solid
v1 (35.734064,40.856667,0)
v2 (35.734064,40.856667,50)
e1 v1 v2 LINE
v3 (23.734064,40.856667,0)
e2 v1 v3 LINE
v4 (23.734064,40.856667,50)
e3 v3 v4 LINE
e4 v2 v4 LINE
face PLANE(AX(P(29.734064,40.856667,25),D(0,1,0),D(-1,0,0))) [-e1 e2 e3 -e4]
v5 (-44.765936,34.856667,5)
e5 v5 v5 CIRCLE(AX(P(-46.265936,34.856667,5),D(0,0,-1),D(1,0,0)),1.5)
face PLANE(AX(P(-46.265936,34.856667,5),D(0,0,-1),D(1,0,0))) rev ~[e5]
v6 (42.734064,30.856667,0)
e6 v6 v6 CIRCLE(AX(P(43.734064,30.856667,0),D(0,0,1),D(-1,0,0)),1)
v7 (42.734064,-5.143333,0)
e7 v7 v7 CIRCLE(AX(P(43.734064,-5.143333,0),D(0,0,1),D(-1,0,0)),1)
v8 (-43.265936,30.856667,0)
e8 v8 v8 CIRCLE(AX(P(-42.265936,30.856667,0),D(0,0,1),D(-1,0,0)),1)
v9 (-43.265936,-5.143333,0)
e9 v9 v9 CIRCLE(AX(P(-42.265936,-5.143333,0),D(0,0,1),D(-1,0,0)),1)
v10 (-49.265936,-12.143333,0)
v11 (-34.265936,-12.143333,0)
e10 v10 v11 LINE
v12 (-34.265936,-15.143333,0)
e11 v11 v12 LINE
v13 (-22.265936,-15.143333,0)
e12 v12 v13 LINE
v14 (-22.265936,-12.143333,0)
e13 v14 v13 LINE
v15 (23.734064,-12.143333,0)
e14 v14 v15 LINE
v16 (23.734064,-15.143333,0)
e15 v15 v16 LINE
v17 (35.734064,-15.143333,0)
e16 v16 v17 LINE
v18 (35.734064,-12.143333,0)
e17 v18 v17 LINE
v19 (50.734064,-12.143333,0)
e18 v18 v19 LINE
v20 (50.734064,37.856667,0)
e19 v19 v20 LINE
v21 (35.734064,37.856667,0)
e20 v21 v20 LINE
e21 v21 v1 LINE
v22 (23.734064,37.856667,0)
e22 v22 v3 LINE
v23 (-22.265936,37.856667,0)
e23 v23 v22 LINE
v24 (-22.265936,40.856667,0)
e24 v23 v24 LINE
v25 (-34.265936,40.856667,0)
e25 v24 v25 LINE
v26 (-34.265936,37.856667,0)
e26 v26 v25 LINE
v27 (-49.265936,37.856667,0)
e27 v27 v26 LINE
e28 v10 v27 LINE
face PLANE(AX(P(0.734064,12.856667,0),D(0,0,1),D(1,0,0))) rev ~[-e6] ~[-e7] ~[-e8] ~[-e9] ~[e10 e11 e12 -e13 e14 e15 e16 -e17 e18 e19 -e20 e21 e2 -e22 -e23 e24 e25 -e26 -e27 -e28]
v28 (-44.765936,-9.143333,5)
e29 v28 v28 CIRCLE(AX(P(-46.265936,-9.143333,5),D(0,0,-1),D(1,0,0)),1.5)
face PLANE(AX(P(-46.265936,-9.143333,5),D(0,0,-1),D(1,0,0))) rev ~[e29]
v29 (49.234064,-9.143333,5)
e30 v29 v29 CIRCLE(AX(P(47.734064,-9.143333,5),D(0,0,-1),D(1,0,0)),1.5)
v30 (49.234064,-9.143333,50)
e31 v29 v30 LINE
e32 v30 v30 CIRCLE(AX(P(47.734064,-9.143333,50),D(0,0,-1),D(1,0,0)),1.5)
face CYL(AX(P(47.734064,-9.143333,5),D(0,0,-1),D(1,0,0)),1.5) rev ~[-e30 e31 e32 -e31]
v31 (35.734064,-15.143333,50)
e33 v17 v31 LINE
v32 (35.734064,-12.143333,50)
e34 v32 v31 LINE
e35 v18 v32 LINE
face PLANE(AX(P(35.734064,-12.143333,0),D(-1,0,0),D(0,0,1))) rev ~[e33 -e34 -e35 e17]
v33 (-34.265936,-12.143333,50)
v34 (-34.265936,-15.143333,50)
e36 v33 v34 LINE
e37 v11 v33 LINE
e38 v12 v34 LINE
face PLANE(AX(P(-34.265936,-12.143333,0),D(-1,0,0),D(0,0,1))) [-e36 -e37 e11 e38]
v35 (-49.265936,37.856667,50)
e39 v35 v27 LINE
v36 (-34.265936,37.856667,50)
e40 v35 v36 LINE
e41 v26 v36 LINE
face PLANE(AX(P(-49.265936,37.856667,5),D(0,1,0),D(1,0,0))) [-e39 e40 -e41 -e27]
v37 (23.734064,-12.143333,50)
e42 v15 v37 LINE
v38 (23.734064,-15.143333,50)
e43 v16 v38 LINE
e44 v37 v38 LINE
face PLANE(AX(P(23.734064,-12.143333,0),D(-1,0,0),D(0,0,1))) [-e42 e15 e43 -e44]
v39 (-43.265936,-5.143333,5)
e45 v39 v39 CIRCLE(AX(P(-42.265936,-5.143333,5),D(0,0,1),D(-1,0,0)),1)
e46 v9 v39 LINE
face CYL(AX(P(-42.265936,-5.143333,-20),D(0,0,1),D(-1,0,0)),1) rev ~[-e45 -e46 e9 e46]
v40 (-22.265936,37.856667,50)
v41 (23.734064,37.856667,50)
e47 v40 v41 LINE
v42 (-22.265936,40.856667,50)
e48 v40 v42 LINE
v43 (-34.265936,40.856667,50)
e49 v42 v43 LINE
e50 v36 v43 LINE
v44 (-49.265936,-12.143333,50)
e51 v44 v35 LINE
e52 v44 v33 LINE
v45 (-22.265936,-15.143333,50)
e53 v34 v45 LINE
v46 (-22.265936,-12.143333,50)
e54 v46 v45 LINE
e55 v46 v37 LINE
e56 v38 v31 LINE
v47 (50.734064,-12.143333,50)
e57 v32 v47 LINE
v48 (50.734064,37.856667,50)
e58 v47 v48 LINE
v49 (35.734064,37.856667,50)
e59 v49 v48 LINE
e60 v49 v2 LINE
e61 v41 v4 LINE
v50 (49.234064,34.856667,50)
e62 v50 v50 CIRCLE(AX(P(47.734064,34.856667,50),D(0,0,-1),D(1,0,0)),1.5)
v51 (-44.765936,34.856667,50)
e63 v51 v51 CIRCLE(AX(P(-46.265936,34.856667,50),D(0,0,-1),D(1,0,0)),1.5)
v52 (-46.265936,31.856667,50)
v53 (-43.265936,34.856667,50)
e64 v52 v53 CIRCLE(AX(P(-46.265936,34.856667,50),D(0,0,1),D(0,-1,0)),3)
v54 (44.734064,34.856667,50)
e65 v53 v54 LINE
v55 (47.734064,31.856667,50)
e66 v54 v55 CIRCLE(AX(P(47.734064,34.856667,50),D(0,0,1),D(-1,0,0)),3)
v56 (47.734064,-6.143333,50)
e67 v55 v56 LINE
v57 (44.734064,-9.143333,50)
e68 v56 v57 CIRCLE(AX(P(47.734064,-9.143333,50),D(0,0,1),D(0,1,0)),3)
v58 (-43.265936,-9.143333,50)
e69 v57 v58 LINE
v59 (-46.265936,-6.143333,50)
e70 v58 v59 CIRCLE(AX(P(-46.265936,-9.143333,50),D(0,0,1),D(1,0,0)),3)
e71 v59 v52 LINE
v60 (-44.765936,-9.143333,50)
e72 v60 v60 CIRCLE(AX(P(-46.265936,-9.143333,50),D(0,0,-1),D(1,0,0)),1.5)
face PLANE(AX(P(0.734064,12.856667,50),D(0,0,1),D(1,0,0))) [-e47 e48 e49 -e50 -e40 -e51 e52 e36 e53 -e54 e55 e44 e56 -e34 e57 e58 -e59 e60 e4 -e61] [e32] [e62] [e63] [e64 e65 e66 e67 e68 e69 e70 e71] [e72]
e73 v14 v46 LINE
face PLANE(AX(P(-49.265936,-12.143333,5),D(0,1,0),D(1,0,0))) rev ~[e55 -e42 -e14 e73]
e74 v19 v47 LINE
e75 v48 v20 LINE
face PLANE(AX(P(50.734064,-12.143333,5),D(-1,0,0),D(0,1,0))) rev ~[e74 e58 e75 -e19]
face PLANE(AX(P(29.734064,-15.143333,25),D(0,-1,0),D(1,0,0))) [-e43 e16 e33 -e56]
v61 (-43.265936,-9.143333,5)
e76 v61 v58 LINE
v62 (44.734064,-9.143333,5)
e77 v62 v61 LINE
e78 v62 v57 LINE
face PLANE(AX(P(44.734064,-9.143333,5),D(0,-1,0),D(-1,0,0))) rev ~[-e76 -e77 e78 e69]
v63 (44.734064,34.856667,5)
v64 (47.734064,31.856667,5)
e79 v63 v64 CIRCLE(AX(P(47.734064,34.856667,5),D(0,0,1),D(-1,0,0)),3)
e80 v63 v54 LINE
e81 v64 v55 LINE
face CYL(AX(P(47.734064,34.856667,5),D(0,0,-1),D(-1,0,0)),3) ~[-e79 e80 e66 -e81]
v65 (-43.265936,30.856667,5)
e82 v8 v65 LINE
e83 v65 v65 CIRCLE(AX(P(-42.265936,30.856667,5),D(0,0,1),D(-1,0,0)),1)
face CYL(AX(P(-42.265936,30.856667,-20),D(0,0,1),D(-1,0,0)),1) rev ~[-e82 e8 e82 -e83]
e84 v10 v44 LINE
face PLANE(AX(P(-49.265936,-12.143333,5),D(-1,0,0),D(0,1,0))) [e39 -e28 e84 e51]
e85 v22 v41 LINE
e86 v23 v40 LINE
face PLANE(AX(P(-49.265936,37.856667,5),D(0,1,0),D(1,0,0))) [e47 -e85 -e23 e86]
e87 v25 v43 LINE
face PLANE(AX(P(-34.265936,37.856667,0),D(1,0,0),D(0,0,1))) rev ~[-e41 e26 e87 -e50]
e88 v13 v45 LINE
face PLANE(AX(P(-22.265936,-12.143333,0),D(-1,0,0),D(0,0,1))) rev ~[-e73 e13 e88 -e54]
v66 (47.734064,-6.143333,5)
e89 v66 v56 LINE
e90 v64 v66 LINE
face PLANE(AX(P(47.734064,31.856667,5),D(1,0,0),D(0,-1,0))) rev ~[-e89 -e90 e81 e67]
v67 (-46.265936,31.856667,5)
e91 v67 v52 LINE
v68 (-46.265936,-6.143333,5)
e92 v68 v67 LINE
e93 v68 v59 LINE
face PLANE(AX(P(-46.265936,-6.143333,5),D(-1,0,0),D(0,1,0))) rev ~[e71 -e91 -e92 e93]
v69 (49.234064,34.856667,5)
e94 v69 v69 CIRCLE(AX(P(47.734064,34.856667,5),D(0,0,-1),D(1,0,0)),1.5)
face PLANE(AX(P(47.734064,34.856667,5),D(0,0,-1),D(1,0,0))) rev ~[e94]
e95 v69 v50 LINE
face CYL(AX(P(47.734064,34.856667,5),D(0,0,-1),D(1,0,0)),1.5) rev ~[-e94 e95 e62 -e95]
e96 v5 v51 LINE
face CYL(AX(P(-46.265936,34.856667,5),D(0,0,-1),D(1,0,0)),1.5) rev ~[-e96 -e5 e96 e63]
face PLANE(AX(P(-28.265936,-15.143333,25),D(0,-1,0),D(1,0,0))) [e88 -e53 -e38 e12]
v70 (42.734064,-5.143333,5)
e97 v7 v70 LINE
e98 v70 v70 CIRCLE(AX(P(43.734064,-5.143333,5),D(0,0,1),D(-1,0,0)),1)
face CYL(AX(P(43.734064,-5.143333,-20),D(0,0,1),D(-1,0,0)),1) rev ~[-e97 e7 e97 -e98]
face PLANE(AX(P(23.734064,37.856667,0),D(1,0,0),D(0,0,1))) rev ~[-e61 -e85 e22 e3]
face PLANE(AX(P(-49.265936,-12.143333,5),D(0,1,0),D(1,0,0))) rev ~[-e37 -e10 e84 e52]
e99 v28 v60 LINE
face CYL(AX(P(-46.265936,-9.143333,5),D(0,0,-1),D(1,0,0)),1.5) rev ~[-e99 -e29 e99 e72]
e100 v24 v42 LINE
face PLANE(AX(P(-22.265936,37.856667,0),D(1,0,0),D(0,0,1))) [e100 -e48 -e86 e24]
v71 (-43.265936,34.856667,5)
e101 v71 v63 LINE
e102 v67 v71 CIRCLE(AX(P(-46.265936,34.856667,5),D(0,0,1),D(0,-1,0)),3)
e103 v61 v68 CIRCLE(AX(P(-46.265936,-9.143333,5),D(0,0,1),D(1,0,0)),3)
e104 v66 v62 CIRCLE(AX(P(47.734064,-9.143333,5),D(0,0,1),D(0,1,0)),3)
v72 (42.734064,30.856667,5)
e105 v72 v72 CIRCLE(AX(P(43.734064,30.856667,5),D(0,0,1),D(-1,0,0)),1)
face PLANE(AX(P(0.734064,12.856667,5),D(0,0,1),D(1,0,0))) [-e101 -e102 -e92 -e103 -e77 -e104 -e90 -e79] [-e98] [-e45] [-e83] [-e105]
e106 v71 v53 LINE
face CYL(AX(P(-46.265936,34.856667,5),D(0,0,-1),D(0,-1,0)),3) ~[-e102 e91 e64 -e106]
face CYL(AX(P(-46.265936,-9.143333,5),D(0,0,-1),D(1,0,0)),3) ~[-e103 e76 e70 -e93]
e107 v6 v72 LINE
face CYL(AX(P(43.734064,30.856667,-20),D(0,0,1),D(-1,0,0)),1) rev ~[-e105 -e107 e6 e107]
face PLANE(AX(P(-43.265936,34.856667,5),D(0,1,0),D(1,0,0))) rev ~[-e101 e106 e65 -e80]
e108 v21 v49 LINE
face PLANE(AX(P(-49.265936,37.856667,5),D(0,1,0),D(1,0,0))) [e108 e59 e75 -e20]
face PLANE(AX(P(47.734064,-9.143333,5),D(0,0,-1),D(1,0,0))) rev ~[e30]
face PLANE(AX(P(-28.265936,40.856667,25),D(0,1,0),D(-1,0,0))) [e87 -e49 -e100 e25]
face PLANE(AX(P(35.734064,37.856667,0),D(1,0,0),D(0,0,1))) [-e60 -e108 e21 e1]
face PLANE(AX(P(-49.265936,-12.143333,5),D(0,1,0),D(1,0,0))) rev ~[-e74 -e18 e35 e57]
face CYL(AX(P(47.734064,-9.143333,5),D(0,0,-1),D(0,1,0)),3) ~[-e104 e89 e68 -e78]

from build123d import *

# Parameters (mm, degrees)
F0_W      = 100
F0_H      = 50
F1_DEPTH  = 5
F2_W      = 100
F2_H      = 50
F3_DEPTH  = 45
F4_W      = 12
F4_H      = 50
F5_DEPTH  = 3
F6_W      = 12
F6_H      = 50
F7_DEPTH  = 3
F8_D      = 3
F8_DEPTH  = 45
F8_TIP    = 0.9012909285
F11_D     = 2
F11_DEPTH = 20
F11_TIP   = 0.600860619


# Not quite as in the source:
# - a feature names something its author has since deleted; it is built from what else it names
# - the program builds the solid bodies; features that only make, move or delete a surface that nothing else refers to are left out


with BuildPart() as f1:
    # F0 (on Top) → F1 (new body)
    with BuildSketch(Plane.XY):
        with Locations((0.7340639085, 12.856667003)):
            Rectangle(F0_W, F0_H)
    extrude(amount=F1_DEPTH)

    # F2 (on face) → F3 (join)
    with BuildSketch(Plane.XY.offset(5)):
        with Locations((0.7340639085, 12.856667003)):
            Rectangle(F2_W, F2_H)
        with BuildLine():
            Line((-46.2659360915, -6.143332997), (-46.2659360915, 31.856667003))
            ThreePointArc((-46.2659360915, 31.856667003), (-44.144615748, 32.7353466595), (-43.2659360915, 34.856667003))
            Line((-43.2659360915, 34.856667003), (44.7340639085, 34.856667003))
            ThreePointArc((44.7340639085, 34.856667003), (45.6127435649, 32.7353466595), (47.7340639085, 31.856667003))
            Line((47.7340639085, 31.856667003), (47.7340639085, -6.143332997))
            ThreePointArc((47.7340639085, -6.143332997), (45.6127435649, -7.0220126534), (44.7340639085, -9.143332997))
            Line((44.7340639085, -9.143332997), (-43.2659360915, -9.143332997))
            ThreePointArc((-43.2659360915, -9.143332997), (-44.144615748, -7.0220126534), (-46.2659360915, -6.143332997))
        make_face(mode=Mode.SUBTRACT)
    extrude(amount=F3_DEPTH)

    # F4 (on face) → F5 (join)
    with BuildSketch(Plane.XZ.offset(12.143332997)):
        with Locations((-28.2659360915, 25)):
            Rectangle(F4_W, F4_H)
        with Locations((29.7340639085, 25)):
            Rectangle(F4_W, F4_H)
    extrude(amount=F5_DEPTH)

    # F6 (on face) → F7 (join)
    with BuildSketch(Plane(origin=(0, 37.856667003, 0), x_dir=(-1, 0, 0), z_dir=(0, 1, 0))):
        with Locations((-29.7340639085, 25)):
            Rectangle(F6_W, F6_H)
        with Locations((28.2659360915, 25)):
            Rectangle(F6_W, F6_H)
    extrude(amount=F7_DEPTH)

    # F8 (one way)
    with BuildSketch(Plane(origin=(0, 0, 5), x_dir=(1, 0, 0), z_dir=(0, 0, -1))):
        with Locations((-46.2659360915, -34.856667003), (-46.2659360915, 9.143332997), (47.7340639085, -34.856667003), (47.7340639085, 9.143332997)):
            Circle(F8_D / 2)
    extrude(amount=-F8_DEPTH, mode=Mode.SUBTRACT)
    with Locations(Plane(origin=(0, 0, 5), x_dir=(1, 0, 0), z_dir=(0, 0, -1))):
        with Locations((-46.2659360915, -34.856667003), (-46.2659360915, 9.143332997), (47.7340639085, -34.856667003), (47.7340639085, 9.143332997)):
            with Locations((0, 0, -(F8_DEPTH + F8_TIP / 2))):  # 118° drill point
                Cone(0, F8_D / 2, F8_TIP, mode=Mode.SUBTRACT)

    # F11
    with Locations(Plane(origin=(0, 0, 0), x_dir=(1, 0, 0), z_dir=(0, 0, -1))):
        with Locations((-42.2659360915, 5.143332997), (43.7340639085, 5.143332997), (43.7340639085, -30.856667003), (-42.2659360915, -30.856667003)):
            Hole(F11_D / 2, depth=F11_DEPTH)
            with Locations((0, 0, -(F11_DEPTH + F11_TIP / 2))):  # 118° drill point
                Cone(0, F11_D / 2, F11_TIP, mode=Mode.SUBTRACT)


solid = f1.part
